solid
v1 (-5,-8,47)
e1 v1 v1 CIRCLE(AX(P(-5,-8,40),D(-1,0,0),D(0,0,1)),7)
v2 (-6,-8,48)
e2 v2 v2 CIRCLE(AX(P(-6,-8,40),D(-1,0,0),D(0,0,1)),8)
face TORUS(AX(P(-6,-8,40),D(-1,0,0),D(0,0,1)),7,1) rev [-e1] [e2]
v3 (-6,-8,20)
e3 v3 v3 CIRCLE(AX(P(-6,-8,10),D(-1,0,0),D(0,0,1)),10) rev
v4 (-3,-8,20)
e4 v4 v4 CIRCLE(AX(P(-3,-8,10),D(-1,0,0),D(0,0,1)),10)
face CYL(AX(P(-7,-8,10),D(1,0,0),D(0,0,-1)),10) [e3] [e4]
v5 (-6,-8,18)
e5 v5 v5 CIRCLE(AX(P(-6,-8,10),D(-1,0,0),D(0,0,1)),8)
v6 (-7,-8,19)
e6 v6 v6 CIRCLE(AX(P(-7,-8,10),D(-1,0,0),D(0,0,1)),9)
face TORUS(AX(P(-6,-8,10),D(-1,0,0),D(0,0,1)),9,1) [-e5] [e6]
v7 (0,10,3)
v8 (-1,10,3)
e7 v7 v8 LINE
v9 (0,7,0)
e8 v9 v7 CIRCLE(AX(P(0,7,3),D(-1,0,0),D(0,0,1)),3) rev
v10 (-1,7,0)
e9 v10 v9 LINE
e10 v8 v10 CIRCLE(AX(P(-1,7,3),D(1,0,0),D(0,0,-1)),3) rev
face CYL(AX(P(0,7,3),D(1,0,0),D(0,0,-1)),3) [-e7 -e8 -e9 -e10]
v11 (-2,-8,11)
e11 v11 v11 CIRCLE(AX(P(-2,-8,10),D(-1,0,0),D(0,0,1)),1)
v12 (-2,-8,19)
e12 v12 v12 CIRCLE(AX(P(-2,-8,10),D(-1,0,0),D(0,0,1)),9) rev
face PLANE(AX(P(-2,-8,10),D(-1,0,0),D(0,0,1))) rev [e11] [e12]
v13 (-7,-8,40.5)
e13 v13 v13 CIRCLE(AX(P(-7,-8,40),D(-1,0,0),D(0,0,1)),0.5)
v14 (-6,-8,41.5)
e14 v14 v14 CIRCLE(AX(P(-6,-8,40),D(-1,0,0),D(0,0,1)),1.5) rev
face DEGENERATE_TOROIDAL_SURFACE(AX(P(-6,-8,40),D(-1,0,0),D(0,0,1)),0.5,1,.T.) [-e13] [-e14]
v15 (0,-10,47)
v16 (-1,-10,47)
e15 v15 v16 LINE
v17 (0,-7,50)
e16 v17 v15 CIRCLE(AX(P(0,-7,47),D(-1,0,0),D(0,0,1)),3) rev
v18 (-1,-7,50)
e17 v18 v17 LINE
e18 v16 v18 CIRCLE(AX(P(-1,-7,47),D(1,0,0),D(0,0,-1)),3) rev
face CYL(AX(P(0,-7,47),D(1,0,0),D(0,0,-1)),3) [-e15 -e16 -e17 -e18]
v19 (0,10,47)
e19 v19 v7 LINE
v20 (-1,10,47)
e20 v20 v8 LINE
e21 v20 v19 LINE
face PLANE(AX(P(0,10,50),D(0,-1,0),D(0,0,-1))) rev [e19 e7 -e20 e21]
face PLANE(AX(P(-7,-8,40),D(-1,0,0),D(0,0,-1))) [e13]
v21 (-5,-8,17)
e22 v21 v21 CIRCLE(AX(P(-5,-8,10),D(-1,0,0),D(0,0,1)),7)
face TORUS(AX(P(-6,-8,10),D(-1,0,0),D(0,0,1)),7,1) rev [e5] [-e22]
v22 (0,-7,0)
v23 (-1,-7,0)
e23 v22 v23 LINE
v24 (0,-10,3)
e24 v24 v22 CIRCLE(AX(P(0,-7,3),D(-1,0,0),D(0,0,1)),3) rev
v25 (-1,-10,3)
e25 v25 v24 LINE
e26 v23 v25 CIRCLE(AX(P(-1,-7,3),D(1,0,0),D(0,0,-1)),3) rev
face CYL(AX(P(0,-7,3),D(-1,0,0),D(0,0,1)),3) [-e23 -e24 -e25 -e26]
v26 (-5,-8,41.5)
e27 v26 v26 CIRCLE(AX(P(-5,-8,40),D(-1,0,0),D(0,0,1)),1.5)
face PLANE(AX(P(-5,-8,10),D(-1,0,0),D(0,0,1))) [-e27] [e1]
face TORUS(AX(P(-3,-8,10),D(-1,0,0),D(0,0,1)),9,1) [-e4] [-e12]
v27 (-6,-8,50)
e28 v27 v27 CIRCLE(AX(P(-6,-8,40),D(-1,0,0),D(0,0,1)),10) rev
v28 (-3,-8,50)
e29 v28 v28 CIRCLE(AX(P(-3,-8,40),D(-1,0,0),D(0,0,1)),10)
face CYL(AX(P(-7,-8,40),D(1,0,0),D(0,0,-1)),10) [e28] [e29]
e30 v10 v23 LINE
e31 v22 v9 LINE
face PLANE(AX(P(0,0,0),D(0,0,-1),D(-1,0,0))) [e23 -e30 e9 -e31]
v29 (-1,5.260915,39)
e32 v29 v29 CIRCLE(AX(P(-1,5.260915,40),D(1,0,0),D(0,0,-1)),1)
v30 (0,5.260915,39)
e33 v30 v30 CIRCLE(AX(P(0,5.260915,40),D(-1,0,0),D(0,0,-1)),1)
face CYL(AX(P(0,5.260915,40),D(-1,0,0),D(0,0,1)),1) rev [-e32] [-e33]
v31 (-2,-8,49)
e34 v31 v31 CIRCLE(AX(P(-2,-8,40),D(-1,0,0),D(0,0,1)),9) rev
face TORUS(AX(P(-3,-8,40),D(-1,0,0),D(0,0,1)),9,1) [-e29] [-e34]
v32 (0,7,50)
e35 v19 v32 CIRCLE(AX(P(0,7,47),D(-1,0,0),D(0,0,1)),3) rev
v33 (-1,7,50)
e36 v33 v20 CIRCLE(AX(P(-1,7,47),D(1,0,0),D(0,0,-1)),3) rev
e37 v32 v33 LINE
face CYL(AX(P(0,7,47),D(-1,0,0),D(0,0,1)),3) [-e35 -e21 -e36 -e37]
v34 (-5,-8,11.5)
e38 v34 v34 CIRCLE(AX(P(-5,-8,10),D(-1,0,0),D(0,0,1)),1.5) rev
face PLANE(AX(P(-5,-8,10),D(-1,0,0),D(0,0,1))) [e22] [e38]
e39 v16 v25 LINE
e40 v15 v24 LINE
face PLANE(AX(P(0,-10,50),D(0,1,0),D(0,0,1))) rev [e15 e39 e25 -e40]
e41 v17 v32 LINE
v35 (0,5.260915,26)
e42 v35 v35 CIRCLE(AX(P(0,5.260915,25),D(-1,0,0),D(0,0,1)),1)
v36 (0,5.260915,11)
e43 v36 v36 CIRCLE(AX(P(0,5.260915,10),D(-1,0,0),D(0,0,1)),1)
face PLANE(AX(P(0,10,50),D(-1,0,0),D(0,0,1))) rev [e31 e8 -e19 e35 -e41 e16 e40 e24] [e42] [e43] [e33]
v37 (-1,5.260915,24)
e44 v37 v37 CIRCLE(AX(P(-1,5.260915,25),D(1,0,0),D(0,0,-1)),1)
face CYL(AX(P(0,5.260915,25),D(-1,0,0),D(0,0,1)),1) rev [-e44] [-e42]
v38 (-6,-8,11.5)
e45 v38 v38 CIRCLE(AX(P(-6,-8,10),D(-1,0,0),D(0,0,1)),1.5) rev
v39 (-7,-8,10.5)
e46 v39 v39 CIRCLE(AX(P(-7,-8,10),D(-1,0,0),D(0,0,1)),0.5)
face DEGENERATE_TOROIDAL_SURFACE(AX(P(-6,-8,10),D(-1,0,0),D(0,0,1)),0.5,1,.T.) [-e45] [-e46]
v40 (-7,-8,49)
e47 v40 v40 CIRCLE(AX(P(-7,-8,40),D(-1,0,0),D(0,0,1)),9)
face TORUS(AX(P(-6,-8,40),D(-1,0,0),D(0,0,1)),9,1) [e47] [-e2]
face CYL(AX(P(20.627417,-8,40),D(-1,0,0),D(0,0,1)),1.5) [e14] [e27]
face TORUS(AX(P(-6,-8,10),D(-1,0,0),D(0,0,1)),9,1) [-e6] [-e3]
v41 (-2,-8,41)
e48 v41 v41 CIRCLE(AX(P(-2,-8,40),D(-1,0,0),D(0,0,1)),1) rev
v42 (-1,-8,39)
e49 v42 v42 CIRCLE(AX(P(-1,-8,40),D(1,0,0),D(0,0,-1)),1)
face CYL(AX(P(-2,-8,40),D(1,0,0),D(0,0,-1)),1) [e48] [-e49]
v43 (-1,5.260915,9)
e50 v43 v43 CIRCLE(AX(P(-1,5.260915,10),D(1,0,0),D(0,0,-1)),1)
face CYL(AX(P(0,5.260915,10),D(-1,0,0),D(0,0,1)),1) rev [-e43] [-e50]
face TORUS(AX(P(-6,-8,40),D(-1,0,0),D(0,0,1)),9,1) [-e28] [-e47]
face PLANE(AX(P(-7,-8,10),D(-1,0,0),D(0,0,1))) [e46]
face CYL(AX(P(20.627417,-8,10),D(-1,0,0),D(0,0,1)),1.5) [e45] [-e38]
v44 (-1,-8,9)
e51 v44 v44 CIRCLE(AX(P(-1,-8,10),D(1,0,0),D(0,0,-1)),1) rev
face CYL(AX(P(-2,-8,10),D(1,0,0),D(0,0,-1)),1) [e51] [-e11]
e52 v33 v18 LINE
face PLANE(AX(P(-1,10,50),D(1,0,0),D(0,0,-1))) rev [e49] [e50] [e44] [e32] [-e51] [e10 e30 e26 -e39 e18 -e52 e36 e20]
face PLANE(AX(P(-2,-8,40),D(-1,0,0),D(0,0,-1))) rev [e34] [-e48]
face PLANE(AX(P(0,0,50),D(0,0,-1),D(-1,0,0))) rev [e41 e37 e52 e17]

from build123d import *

# Parameters (mm, degrees)
SKETCH1_W               = 1
SKETCH1_H               = 20
BOSS_EXTRUDE1_DEPTH     = 50
SKETCH6_R               = 1
BOSS_EXTRUDE2_DEPTH     = 1
SKETCH7_R               = 10
BOSS_EXTRUDE3_DEPTH     = 5
SKETCH9_R               = 8
SKETCH9_R_2             = 1.5
CUT_EXTRUDE1_DEPTH      = 2
FILLET3_R               = 1
FILLET4_R               = 1
FILLET6_R               = 1
FILLET7_R               = 1
FILLET3_OF_MIRROR2_R    = 1
FILLET4_OF_MIRROR2_R    = 1
FILLET6_OF_MIRROR2_R    = 1
FILLET7_OF_MIRROR2_R    = 1
FILLET8_R               = 3
CUT_EXTRUDE2_DEPTH      = 54.478967862
CUT_EXTRUDE2_DEPTH_BACK = 54.478967862
SKETCH10_R              = 1


with BuildPart() as part:
    # Sketch1 → Boss-Extrude1 (new body)
    with BuildSketch(Plane.XY):
        with Locations((-0.5, 0)):
            Rectangle(SKETCH1_W, SKETCH1_H)
    extrude(amount=BOSS_EXTRUDE1_DEPTH)

    # Sketch6 → Boss-Extrude2 (add)
    with BuildSketch(Plane.ZY.offset(1)):
        with Locations(Location((10, -8, 0), (0, 0, 180))):
            Circle(SKETCH6_R)
    boss_extrude2 = extrude(amount=BOSS_EXTRUDE2_DEPTH)

    # Sketch7 → Boss-Extrude3 (add)
    with BuildSketch(Plane.ZY.offset(2)):
        with Locations((10, -8)):
            Circle(SKETCH7_R)
    boss_extrude3 = extrude(amount=BOSS_EXTRUDE3_DEPTH)

    # Sketch9 → Cut-Extrude1 (cut)
    with BuildSketch(Plane.ZY.offset(7)):
        with Locations((10, -8)):
            Circle(SKETCH9_R)
        with Locations((10, -8)):
            Circle(SKETCH9_R_2, mode=Mode.SUBTRACT)
    cut_extrude1 = extrude(amount=-CUT_EXTRUDE1_DEPTH, mode=Mode.SUBTRACT)

    # Fillet3
    fillet3_edges = [part.edges().sort_by_distance(p)[0] for p in [
        (-7, -8, 8.5),
    ]]
    fillet(fillet3_edges, radius=FILLET3_R)

    # Fillet4
    fillet4_edges = [part.edges().sort_by_distance(p)[0] for p in [
        (-2, -8, 0),
        (-7, -8, 0),
    ]]
    fillet(fillet4_edges, radius=FILLET4_R)

    # Fillet6
    fillet6_edges = [part.edges().sort_by_distance(p)[0] for p in [
        (-7, -8, 2),
    ]]
    fillet(fillet6_edges, radius=FILLET6_R - 0.0001)  # a hair under: the kernel refuses the full size

    # Fillet7
    fillet7_edges = [part.edges().sort_by_distance(p)[0] for p in [
        (-5, -8, 2),
    ]]
    fillet(fillet7_edges, radius=FILLET7_R)

    # Mirror2: Boss-Extrude2, Boss-Extrude3, Cut-Extrude1 across plane
    add(boss_extrude2.mirror(Plane.XY.offset(25)))
    add(boss_extrude3.mirror(Plane.XY.offset(25)))
    add(cut_extrude1.mirror(Plane.XY.offset(25)), mode=Mode.SUBTRACT)

    # Fillet3 of Mirror2
    fillet3_of_mirror2_edges = [part.edges().sort_by_distance(p)[0] for p in [
        (-7, -8, 41.5),
    ]]
    fillet(fillet3_of_mirror2_edges, radius=FILLET3_OF_MIRROR2_R)

    # Fillet4 of Mirror2
    fillet4_of_mirror2_edges = [part.edges().sort_by_distance(p)[0] for p in [
        (-2, -8, 50),
        (-7, -8, 50),
    ]]
    fillet(fillet4_of_mirror2_edges, radius=FILLET4_OF_MIRROR2_R)

    # Fillet6 of Mirror2
    fillet6_of_mirror2_edges = [part.edges().sort_by_distance(p)[0] for p in [
        (-7, -8, 48),
    ]]
    fillet(fillet6_of_mirror2_edges, radius=FILLET6_OF_MIRROR2_R - 0.0001)  # a hair under: the kernel refuses the full size

    # Fillet7 of Mirror2
    fillet7_of_mirror2_edges = [part.edges().sort_by_distance(p)[0] for p in [
        (-5, -8, 48),
    ]]
    fillet(fillet7_of_mirror2_edges, radius=FILLET7_OF_MIRROR2_R)

    # Fillet8
    fillet8_edges = [part.edges().sort_by_distance(p)[0] for p in [
        (-0.5, -10, 50),
        (-0.5, -10, 0),
        (-0.5, 10, 0),
        (-0.5, 10, 50),
    ]]
    fillet(fillet8_edges, radius=FILLET8_R)

    # Sketch10 → Cut-Extrude2 (cut, two sides: drawn at the far end of the back side and taken through both)
    with BuildSketch(Plane.ZY.offset(1).offset(-CUT_EXTRUDE2_DEPTH_BACK)):
        with Locations((10, 5.260914639)):
            Circle(SKETCH10_R)
        with Locations((25, 5.260914639)):
            Circle(SKETCH10_R)
        with Locations(Location((40, 5.260914639, 0), (0, 0, 180))):
            Circle(SKETCH10_R)
    extrude(amount=CUT_EXTRUDE2_DEPTH + CUT_EXTRUDE2_DEPTH_BACK, mode=Mode.SUBTRACT)


solid = part.part
